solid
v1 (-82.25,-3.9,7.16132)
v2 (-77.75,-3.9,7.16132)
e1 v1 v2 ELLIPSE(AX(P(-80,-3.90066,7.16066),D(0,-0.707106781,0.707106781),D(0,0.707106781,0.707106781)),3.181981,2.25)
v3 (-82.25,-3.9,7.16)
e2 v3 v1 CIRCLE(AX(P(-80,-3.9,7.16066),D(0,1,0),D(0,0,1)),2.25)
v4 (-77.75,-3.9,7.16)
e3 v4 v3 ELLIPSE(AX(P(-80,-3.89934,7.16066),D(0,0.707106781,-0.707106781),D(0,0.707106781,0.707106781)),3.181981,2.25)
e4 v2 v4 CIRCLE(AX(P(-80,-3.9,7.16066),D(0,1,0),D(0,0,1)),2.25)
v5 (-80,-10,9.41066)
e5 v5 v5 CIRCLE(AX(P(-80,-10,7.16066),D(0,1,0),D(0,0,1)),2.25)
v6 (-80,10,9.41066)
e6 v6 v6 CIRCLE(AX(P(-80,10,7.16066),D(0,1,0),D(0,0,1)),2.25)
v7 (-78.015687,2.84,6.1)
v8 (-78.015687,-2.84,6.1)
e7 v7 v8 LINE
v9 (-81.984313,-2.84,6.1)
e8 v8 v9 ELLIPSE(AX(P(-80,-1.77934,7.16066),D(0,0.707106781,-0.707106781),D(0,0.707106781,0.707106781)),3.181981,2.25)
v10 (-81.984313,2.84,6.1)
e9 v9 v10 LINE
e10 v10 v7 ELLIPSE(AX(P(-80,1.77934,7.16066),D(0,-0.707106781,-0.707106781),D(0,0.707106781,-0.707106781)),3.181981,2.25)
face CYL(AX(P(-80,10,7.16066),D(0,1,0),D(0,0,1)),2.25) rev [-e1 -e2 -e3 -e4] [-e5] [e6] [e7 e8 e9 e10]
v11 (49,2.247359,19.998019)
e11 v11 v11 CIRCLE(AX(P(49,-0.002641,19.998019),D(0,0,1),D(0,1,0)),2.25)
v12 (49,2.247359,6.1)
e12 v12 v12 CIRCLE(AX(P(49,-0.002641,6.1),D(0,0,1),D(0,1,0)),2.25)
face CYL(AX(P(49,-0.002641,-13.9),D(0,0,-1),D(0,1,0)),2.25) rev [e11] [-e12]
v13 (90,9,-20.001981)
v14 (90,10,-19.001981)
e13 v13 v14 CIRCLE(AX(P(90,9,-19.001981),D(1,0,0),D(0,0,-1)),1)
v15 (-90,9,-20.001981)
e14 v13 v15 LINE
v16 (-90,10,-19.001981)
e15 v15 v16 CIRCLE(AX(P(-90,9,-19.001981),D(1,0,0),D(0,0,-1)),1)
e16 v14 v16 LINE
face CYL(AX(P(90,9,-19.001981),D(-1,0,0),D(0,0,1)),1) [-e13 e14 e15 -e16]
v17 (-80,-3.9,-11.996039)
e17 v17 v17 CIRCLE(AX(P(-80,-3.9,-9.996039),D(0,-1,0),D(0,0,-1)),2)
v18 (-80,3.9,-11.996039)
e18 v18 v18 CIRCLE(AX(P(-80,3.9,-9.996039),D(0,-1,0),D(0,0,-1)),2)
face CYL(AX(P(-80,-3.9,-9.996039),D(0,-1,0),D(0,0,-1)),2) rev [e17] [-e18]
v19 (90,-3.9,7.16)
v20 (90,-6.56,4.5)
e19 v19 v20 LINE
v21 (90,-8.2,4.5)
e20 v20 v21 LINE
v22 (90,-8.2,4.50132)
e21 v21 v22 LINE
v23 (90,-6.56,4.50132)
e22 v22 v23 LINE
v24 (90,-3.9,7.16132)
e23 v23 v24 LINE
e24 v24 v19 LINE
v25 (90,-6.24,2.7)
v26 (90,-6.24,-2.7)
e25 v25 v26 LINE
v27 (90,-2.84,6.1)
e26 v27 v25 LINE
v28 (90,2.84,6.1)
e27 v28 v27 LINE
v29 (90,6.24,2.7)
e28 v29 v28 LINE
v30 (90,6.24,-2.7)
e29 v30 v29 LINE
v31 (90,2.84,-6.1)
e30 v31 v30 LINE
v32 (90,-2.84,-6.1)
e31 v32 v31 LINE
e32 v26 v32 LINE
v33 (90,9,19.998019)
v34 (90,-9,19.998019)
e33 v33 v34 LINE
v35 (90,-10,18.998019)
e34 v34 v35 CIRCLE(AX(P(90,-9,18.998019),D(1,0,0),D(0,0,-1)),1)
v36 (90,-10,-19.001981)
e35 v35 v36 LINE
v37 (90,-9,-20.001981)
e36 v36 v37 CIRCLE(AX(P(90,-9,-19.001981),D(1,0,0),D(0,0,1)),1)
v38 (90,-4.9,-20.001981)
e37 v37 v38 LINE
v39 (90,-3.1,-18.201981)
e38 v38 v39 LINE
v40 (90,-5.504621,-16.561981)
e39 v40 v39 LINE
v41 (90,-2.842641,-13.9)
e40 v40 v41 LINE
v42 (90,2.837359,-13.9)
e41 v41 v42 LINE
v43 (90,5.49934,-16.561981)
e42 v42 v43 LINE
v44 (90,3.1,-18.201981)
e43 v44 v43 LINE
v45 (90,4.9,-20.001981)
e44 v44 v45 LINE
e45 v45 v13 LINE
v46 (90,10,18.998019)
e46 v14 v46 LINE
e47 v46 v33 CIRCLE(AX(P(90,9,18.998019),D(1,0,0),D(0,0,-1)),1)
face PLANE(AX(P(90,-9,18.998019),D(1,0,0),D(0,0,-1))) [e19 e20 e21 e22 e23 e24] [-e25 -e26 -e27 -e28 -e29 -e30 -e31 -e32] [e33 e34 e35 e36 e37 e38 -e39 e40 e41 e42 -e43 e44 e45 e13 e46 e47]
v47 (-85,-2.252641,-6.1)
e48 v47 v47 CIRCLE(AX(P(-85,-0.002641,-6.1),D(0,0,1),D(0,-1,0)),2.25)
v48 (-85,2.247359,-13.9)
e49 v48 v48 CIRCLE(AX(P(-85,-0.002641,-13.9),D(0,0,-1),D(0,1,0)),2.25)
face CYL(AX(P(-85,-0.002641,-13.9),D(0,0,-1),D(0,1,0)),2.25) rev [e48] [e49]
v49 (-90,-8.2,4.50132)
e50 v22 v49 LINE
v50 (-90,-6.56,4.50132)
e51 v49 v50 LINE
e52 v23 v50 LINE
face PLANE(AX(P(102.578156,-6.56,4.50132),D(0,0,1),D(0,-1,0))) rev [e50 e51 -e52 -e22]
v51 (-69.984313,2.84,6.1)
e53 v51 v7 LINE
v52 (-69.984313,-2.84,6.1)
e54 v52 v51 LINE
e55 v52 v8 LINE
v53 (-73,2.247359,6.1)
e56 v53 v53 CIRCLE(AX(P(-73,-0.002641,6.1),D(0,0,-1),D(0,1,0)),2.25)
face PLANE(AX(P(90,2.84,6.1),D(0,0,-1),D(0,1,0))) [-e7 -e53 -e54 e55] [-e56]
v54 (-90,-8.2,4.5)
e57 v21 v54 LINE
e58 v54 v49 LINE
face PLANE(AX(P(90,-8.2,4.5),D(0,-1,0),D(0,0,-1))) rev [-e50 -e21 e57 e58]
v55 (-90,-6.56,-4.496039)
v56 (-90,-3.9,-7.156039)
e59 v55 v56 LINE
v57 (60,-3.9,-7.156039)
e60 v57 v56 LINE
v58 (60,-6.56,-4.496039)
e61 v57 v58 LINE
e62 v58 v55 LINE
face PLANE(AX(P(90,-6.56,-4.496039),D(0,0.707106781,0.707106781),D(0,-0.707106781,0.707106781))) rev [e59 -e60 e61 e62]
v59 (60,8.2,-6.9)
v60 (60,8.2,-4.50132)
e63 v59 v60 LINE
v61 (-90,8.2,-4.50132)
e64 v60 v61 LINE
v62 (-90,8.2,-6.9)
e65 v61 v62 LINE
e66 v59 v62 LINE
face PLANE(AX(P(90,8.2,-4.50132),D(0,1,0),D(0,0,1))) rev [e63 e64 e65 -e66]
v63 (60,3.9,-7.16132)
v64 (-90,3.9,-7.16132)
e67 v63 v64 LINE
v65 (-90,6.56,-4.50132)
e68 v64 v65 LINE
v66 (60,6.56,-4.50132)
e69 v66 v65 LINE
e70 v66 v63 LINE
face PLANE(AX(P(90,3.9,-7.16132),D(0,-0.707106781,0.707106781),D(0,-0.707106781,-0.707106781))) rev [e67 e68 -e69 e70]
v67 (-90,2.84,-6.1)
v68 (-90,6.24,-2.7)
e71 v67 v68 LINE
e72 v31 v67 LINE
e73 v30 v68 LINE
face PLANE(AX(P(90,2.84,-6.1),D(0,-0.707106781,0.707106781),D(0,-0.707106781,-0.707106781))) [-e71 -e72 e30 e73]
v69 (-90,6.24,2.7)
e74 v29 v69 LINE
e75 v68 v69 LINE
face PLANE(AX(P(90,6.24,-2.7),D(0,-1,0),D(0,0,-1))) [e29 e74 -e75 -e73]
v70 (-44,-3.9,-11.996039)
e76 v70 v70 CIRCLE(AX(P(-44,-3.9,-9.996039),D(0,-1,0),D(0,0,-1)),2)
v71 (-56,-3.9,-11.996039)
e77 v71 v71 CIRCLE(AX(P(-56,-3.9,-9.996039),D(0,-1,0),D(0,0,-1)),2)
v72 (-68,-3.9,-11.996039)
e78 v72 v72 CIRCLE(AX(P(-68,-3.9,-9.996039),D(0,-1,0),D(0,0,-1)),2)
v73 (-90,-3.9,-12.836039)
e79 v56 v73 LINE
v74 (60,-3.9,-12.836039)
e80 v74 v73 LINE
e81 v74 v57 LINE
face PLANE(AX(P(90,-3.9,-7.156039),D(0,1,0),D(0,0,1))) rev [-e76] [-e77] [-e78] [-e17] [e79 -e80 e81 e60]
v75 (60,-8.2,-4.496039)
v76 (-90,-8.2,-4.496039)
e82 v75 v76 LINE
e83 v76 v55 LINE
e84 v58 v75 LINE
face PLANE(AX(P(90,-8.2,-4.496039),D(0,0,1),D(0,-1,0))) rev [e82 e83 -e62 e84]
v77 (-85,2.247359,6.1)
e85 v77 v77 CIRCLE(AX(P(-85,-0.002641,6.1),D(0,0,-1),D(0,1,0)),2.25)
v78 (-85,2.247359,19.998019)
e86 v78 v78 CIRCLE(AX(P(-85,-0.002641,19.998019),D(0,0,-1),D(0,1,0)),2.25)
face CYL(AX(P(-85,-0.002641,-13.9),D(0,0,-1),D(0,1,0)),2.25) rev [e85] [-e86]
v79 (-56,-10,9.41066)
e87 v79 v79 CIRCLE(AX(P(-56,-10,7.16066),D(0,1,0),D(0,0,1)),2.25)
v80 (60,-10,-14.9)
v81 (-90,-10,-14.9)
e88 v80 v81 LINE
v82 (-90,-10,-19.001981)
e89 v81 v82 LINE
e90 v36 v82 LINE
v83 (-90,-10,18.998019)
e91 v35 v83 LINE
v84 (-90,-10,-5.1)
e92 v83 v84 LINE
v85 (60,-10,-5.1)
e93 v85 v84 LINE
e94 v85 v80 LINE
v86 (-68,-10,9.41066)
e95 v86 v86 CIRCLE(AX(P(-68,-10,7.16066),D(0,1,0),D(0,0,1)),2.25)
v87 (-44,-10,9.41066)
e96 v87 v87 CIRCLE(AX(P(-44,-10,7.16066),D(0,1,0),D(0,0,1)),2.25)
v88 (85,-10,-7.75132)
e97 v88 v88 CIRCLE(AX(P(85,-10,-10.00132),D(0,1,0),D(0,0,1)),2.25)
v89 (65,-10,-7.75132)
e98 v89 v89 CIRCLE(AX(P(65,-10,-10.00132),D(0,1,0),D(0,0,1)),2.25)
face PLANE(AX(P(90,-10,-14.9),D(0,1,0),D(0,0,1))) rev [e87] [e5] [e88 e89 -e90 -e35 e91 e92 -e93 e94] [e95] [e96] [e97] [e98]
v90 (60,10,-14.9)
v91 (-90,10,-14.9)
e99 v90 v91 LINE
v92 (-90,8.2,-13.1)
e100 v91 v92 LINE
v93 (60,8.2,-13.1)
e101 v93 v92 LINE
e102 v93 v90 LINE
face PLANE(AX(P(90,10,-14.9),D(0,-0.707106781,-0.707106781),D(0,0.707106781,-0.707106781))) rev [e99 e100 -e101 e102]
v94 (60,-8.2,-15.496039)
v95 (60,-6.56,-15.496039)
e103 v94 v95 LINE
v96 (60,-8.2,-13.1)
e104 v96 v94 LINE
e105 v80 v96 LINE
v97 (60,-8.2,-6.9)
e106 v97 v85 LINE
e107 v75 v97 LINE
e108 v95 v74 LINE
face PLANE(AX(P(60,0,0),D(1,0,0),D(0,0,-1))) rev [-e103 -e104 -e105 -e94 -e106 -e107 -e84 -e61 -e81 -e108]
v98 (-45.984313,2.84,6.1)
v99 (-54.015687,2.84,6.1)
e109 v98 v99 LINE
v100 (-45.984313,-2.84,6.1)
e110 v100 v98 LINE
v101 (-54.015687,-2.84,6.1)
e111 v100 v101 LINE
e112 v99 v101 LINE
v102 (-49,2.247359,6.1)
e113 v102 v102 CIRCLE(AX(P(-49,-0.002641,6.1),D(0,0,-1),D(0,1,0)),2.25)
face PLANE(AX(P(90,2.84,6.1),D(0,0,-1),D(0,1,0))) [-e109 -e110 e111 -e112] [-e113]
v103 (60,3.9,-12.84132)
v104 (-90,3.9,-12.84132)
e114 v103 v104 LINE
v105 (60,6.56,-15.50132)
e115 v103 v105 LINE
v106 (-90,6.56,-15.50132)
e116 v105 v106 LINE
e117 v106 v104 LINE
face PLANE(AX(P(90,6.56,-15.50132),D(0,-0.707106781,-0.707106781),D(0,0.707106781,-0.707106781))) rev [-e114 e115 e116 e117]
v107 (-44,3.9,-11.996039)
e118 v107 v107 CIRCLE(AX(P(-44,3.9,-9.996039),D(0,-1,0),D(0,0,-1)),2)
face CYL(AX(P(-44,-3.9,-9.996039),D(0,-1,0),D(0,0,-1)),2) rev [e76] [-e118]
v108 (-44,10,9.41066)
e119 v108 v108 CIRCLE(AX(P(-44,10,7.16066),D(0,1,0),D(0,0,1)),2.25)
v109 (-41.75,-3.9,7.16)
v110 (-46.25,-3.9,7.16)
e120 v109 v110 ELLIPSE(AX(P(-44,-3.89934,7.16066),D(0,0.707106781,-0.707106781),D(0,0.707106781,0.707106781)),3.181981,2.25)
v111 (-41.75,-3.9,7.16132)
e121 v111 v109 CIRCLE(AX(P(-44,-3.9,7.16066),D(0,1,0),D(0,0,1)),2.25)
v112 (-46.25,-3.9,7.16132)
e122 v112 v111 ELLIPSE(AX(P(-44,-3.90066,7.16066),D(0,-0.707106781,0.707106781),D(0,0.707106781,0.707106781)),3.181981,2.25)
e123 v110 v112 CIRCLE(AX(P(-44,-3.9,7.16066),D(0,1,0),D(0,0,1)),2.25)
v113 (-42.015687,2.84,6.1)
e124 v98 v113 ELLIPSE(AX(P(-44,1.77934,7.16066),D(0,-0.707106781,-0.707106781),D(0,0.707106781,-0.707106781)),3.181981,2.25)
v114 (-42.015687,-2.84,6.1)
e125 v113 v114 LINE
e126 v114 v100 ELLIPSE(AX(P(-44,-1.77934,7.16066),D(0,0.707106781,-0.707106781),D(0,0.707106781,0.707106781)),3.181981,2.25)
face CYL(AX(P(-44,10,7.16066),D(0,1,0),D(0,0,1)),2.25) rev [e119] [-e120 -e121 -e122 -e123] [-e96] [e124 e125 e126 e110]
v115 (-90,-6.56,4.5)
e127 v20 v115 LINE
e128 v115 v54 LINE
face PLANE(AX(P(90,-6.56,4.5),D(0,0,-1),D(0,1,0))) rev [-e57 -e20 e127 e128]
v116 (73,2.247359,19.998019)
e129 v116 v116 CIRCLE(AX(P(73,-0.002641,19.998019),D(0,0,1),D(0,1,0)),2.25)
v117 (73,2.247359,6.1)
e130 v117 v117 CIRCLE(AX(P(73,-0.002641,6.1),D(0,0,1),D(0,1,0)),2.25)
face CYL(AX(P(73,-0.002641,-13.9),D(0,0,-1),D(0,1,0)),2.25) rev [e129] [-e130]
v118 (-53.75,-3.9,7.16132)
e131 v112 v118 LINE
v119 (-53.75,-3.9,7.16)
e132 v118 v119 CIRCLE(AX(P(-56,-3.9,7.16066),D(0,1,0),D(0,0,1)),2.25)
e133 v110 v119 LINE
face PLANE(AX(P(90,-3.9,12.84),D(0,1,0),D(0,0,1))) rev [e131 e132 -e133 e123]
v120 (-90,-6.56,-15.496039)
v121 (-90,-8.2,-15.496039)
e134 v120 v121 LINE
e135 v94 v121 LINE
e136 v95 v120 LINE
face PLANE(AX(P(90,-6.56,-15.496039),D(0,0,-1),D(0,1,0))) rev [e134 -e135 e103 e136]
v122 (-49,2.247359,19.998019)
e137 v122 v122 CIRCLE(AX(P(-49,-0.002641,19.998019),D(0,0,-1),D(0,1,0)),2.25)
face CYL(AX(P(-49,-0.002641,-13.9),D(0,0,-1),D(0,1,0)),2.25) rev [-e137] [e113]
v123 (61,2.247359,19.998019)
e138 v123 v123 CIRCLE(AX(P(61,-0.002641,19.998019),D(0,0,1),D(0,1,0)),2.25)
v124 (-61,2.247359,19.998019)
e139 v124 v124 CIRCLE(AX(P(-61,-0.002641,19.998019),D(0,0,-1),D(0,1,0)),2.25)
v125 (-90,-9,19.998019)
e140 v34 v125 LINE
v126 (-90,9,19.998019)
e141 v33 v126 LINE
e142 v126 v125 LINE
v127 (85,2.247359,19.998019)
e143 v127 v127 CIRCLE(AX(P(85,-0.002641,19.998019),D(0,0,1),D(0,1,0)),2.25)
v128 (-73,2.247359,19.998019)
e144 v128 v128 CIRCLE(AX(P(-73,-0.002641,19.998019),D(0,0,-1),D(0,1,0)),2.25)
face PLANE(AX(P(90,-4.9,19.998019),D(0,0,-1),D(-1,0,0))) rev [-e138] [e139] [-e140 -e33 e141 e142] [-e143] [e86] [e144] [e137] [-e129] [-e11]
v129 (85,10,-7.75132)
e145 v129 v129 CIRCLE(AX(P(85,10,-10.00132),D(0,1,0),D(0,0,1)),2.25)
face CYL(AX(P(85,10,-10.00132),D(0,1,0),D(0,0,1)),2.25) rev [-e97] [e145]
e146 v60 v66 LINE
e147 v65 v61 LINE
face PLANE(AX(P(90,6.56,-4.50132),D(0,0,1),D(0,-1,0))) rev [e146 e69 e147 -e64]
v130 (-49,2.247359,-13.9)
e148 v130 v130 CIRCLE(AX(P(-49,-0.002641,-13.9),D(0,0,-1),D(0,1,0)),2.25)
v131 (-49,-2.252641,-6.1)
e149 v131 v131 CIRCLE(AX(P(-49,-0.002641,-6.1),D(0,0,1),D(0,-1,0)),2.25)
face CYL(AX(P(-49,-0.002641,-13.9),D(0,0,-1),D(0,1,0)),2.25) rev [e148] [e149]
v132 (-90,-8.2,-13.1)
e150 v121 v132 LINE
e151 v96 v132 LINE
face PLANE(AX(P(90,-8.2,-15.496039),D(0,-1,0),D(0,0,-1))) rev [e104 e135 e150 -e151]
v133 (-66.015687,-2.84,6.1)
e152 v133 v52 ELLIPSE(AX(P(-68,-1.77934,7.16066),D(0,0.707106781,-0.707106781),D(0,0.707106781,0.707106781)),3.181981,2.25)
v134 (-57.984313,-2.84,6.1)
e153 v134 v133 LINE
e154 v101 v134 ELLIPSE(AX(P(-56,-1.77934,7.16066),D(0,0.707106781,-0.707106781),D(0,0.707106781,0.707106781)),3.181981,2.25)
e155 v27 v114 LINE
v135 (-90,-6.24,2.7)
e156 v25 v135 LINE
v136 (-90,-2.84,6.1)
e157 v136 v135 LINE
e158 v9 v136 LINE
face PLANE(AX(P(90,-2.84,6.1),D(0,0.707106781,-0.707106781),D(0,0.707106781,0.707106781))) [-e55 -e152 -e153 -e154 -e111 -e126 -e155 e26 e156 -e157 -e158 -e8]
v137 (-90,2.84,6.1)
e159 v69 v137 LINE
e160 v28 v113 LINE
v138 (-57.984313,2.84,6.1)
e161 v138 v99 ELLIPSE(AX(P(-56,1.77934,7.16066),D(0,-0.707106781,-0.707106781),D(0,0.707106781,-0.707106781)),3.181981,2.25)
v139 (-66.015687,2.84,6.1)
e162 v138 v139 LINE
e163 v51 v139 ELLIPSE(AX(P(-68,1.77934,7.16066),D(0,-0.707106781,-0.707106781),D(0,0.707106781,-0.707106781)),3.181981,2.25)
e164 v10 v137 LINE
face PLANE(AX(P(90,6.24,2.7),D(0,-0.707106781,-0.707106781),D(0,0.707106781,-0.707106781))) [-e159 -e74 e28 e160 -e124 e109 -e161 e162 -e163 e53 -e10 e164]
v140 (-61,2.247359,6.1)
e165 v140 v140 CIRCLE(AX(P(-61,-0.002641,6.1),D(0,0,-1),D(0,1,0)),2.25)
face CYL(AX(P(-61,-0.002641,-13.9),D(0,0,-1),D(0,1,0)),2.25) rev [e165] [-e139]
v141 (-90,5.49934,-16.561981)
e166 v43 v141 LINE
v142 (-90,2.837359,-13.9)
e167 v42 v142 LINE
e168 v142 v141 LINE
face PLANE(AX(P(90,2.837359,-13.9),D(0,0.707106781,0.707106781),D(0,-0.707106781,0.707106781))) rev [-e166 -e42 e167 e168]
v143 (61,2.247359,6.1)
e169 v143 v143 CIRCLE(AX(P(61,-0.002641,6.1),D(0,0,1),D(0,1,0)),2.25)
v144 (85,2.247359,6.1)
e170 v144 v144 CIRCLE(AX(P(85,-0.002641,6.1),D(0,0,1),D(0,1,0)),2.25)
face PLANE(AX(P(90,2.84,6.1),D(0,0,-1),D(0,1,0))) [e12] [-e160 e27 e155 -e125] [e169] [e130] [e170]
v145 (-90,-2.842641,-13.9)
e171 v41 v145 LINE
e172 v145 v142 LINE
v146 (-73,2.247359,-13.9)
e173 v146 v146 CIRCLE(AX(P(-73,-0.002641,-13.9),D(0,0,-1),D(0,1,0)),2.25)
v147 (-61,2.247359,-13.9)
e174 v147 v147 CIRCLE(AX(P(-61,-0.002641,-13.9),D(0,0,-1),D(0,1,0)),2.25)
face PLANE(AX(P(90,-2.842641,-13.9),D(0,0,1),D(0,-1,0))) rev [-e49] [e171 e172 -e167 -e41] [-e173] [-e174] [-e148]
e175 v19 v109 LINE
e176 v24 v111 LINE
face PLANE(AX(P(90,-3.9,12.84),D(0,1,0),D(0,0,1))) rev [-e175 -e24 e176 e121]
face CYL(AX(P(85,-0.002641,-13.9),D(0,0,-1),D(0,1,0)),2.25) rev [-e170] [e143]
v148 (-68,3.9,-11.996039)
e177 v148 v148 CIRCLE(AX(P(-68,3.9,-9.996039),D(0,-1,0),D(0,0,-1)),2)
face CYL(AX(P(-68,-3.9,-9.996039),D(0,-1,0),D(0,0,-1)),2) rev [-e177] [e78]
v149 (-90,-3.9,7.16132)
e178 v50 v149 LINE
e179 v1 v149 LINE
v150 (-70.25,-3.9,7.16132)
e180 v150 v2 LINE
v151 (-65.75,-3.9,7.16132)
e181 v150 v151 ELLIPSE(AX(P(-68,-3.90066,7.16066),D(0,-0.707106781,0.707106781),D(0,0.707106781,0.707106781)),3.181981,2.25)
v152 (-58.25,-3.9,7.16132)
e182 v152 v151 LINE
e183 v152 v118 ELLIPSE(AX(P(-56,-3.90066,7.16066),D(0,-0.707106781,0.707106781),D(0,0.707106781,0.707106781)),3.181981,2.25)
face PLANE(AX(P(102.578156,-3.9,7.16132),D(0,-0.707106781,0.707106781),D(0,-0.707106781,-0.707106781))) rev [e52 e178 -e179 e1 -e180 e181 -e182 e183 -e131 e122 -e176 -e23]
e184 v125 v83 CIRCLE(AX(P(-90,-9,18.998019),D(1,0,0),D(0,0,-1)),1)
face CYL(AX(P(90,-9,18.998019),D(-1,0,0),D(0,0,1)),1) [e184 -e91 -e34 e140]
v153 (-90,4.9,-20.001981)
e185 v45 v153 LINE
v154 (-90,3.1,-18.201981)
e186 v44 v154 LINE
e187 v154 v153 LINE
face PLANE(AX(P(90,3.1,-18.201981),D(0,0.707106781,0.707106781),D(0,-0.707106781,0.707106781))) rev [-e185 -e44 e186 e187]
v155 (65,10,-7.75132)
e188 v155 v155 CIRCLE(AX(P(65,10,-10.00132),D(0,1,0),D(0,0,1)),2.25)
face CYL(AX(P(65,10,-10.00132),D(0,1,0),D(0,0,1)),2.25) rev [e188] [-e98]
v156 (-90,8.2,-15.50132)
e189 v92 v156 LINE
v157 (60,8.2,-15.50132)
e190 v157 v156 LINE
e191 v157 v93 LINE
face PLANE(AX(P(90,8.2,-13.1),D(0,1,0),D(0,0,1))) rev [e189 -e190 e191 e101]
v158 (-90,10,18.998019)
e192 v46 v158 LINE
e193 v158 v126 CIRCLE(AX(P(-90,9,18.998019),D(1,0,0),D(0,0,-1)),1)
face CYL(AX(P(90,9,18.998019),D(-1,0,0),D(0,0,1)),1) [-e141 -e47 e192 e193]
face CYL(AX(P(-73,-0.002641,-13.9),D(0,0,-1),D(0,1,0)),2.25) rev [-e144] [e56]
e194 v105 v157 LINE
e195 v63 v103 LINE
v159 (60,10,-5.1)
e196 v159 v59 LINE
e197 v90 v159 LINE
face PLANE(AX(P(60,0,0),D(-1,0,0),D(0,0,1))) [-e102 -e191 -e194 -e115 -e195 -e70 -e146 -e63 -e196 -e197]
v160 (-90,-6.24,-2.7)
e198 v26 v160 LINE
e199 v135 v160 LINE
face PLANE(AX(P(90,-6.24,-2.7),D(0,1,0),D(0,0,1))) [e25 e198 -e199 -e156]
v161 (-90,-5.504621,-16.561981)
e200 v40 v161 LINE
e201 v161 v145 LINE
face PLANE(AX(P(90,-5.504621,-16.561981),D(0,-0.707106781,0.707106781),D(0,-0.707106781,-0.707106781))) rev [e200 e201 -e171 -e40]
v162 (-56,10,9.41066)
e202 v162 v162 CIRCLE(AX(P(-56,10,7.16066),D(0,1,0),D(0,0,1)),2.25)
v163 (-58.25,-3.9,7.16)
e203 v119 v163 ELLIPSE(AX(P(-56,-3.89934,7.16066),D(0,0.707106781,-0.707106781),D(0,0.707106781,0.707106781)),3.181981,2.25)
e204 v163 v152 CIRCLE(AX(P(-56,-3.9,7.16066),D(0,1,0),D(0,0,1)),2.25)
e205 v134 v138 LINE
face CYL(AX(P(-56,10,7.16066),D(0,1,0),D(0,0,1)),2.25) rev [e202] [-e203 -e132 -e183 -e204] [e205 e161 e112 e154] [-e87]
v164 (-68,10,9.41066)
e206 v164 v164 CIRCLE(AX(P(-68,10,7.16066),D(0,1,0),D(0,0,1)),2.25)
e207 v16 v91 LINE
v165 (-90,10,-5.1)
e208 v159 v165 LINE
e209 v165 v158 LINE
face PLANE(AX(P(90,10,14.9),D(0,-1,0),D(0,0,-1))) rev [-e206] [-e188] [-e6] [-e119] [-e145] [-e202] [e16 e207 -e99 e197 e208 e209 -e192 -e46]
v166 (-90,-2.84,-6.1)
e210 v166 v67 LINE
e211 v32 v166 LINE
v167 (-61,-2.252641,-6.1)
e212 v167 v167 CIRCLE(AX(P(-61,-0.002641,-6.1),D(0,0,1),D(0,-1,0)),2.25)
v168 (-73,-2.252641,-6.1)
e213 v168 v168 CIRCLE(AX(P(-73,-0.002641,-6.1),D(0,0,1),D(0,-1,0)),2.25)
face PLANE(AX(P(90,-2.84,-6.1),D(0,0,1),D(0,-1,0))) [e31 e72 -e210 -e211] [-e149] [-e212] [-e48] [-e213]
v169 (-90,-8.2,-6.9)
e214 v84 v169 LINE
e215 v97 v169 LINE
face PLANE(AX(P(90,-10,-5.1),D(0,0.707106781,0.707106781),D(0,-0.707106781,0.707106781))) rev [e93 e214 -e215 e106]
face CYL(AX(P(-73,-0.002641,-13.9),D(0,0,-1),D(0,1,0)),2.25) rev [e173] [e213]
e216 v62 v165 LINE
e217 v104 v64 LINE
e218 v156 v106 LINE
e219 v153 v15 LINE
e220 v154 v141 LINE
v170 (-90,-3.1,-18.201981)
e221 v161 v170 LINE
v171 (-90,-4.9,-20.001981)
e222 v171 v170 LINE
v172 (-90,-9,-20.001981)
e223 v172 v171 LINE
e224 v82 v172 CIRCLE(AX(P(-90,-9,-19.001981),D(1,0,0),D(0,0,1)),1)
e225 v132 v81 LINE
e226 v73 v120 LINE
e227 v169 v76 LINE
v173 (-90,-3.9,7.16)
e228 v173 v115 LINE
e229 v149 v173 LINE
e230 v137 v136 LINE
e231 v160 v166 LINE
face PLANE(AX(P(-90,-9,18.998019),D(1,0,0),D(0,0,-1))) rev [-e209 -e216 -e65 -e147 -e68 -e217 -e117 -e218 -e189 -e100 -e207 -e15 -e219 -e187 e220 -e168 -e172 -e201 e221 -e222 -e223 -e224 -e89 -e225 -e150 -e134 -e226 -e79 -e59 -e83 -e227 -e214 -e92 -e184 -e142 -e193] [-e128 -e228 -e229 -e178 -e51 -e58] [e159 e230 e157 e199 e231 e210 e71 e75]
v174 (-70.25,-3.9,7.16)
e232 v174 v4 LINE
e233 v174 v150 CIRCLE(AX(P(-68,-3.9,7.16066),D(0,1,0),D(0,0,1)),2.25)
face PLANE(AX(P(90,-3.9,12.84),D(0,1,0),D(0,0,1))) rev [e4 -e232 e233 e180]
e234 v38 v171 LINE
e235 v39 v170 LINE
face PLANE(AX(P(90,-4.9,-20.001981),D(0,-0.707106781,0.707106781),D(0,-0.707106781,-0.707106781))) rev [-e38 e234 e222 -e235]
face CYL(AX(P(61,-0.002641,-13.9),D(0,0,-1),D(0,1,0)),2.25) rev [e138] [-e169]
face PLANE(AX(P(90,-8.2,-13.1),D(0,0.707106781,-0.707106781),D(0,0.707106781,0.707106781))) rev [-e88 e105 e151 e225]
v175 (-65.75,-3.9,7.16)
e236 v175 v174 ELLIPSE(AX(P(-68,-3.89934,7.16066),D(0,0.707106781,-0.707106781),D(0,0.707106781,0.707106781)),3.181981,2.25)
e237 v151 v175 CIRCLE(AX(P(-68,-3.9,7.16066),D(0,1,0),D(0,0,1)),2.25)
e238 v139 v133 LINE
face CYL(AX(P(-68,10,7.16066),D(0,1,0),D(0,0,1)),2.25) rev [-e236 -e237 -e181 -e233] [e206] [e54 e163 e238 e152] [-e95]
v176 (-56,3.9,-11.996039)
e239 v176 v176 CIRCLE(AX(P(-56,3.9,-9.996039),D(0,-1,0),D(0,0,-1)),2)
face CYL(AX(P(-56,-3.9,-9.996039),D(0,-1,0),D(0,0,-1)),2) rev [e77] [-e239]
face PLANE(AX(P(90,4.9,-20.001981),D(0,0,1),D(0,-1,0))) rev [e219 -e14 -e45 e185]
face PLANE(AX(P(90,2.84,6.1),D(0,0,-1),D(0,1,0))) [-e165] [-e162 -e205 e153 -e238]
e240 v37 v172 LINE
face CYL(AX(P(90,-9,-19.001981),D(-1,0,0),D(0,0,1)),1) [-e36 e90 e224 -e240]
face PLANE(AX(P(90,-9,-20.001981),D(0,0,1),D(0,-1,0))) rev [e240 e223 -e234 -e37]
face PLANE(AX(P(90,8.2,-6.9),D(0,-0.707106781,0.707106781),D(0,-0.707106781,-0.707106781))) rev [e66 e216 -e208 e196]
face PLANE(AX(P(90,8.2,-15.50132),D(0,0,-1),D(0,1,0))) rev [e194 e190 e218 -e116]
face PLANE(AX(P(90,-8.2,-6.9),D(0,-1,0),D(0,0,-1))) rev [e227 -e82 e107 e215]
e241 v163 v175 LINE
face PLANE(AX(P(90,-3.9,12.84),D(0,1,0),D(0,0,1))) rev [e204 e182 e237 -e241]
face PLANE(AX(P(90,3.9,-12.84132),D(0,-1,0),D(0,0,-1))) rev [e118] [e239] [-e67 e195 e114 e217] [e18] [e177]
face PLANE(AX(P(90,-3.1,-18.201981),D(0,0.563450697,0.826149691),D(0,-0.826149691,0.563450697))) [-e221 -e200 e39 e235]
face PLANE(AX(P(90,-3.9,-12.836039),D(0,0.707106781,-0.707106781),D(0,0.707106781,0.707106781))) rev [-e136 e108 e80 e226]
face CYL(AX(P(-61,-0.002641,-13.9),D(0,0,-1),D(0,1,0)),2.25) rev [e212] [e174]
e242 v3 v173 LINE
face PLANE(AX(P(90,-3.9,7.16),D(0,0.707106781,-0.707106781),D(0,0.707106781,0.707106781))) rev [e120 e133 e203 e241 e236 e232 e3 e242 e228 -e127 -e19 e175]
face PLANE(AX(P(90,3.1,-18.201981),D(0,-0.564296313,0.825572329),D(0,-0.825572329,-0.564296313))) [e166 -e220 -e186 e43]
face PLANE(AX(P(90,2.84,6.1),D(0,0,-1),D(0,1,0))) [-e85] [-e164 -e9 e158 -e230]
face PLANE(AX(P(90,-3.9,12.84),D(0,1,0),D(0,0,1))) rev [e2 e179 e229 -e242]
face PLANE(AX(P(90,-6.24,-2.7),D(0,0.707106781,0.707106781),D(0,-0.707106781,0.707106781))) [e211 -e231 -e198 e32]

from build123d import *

# Parameters (mm, degrees)
BOSS_EXTRUDE1_DEPTH             = 90
BOSS_EXTRU_2_DEPTH              = 180
BOSS_EXTRUDE2_DEPTH             = 180
DIAM_TRE_DU_PER_AGE_4_5_4_5_1_D = 4.5
DIAM_TRE_DU_PER_AGE_4_0_4_1_D   = 4
F_4_5_4_5_DIAMETER_HOLE1_D      = 4.5
BOSS_EXTRU_1_DEPTH              = 30
BOSS_EXTRU_3_DEPTH              = 30
SYM_TRIE2_START                 = 6.1
SYM_TRIE2_OUTLINE_R             = 2.25
SYM_TRIE2_DEPTH                 = 13.898019485
DIAM_TRE_DU_PER_AGE_4_5_4_5_4_D = 4.5
ESQUISSE15_W                    = 5.4
ESQUISSE15_H                    = 1.96
BOSS_EXTRU_4_DEPTH              = 180


# Read off the part's stored shape, not the designer's step: Symétrie2
with BuildPart() as part:
    # Sketch5 → Boss-Extrude1 (new, symmetric)
    with BuildSketch(Plane(origin=(0, 0, 0), x_dir=(0, 0, -1), z_dir=(1, 0, 0))):
        with BuildLine():
            Line((-19.998019485, 4.9), (-18.198019485, 3.1))
            Line((-18.198019485, 3.1), (-18.198019485, 5.499339828))
            Line((-18.198019485, 5.499339828), (-16.558019485, 5.499339828))
            Line((-16.558019485, 5.499339828), (-13.9, 2.841320344))
            Line((-13.9, 2.841320344), (-13.9, -2.838679656))
            Line((-13.9, -2.838679656), (-16.558019485, -5.496699141))
            Line((-16.558019485, -5.496699141), (-18.198019485, -5.496699141))
            Line((-18.198019485, -5.496699141), (-18.198019485, -3.1))
            Line((-18.198019485, -3.1), (-19.998019485, -4.9))
            Line((-19.998019485, -4.9), (-19.998019485, -9))
            ThreePointArc((-19.998019485, -9), (-19.705126266, -9.707106781), (-18.998019485, -10))
            Line((-18.998019485, -10), (-14.9, -10))
            Line((-14.9, -10), (-13.1, -8.2))
            Line((-13.1, -8.2), (-15.5, -8.2))
            Line((-15.5, -8.2), (-15.5, -6.56))
            Line((-15.5, -6.56), (-12.84, -3.9))
            Line((-12.84, -3.9), (-7.16, -3.9))
            Line((-7.16, -3.9), (-4.5, -6.56))
            Line((-4.5, -6.56), (-4.5, -8.2))
            Line((-4.5, -8.2), (-6.9, -8.2))
            Line((-6.9, -8.2), (-5.1, -10))
            Line((-5.1, -10), (5.1, -10))
            Line((5.1, -10), (6.9, -8.2))
            Line((6.9, -8.2), (4.496038969, -8.2))
            Line((4.496038969, -8.2), (4.496038969, -6.56))
            Line((4.496038969, -6.56), (7.156038969, -3.9))
            Line((7.156038969, -3.9), (12.836038969, -3.9))
            Line((12.836038969, -3.9), (15.496038969, -6.56))
            Line((15.496038969, -6.56), (15.496038969, -8.2))
            Line((15.496038969, -8.2), (13.1, -8.2))
            Line((13.1, -8.2), (14.9, -10))
            Line((14.9, -10), (19.001980515, -10))
            ThreePointArc((19.001980515, -10), (19.709087297, -9.707106781), (20.001980515, -9))
            Line((20.001980515, -9), (20.001980515, -4.9))
            Line((20.001980515, -4.9), (18.201980515, -3.1))
            Line((18.201980515, -3.1), (18.201980515, -5.504621202))
            Line((18.201980515, -5.504621202), (16.561980515, -5.504621202))
            Line((16.561980515, -5.504621202), (13.9, -2.842640687))
            Line((13.9, -2.842640687), (13.9, 2.837359313))
            Line((13.9, 2.837359313), (16.561980515, 5.499339828))
            Line((16.561980515, 5.499339828), (18.201980515, 5.499339828))
            Line((18.201980515, 5.499339828), (18.201980515, 3.1))
            Line((18.201980515, 3.1), (20.001980515, 4.9))
            Line((20.001980515, 4.9), (20.001980515, 9))
            ThreePointArc((20.001980515, 9), (19.709087297, 9.707106781), (19.001980515, 10))
            Line((19.001980515, 10), (14.9, 10))
            Line((14.9, 10), (13.1, 8.2))
            Line((13.1, 8.2), (15.501320344, 8.2))
            Line((15.501320344, 8.2), (15.501320344, 6.56))
            Line((15.501320344, 6.56), (12.841320344, 3.9))
            Line((12.841320344, 3.9), (7.161320344, 3.9))
            Line((7.161320344, 3.9), (4.501320344, 6.56))
            Line((4.501320344, 6.56), (4.501320344, 8.2))
            Line((4.501320344, 8.2), (6.9, 8.2))
            Line((6.9, 8.2), (5.1, 10))
            Line((5.1, 10), (-5.1, 10))
            Line((-5.1, 10), (-6.9, 8.2))
            Line((-6.9, 8.2), (-4.501320344, 8.2))
            Line((-4.501320344, 8.2), (-4.501320344, 6.56))
            Line((-4.501320344, 6.56), (-7.161320344, 3.9))
            Line((-7.161320344, 3.9), (-12.841320344, 3.9))
            Line((-12.841320344, 3.9), (-15.501320344, 6.56))
            Line((-15.501320344, 6.56), (-15.501320344, 8.2))
            Line((-15.501320344, 8.2), (-13.1, 8.2))
            Line((-13.1, 8.2), (-14.9, 10))
            Line((-14.9, 10), (-18.998019485, 10))
            ThreePointArc((-18.998019485, 10), (-19.705126266, 9.707106781), (-19.998019485, 9))
            Line((-19.998019485, 9), (-19.998019485, 4.9))
        make_face()
        Polygon((6.1, -2.84), (6.1, 2.84), (2.7, 6.24), (2.7, 8.2), (-2.7, 8.2), (-2.7, 6.24), (-6.1, 2.84), (-6.1, -2.84), (-2.7, -6.24), (-2.7, -8.2), (2.7, -8.2), (2.7, -6.24), align=None, mode=Mode.SUBTRACT)
    extrude(amount=BOSS_EXTRUDE1_DEPTH, both=True)

    # Esquisse10 → Boss.-Extru.2 (add, through all)
    with BuildSketch(Plane(origin=(90, 0, 0), x_dir=(0, 0, -1), z_dir=(1, 0, 0))):
        Polygon((-19.998019485, 4.9), (-19.998019485, -4.9), (-18.198019485, -3.1), (-18.198019485, -5.496699141), (-16.558019485, -5.496699141), (-13.9, -2.838679656), (-13.9, 2.841320344), (-16.558019485, 5.499339828), (-18.198019485, 5.499339828), (-18.198019485, 3.1), align=None)
    extrude(amount=-BOSS_EXTRU_2_DEPTH)

    # Sketch6 → Boss-Extrude2 (add)
    with BuildSketch(Plane.ZY.offset(90)):
        Polygon((5.1, 10), (14.9, 10), (13.1, 8.2), (15.501320344, 8.2), (15.501320344, 6.56), (12.841320344, 3.9), (7.161320344, 3.9), (4.501320344, 6.56), (4.501320344, 8.2), (6.9, 8.2), align=None)
    boss_extrude2 = extrude(amount=-BOSS_EXTRUDE2_DEPTH)

    # Diamètre du perçage Ø4.5 (4.5)1 (through all)
    with Locations(Plane(origin=(0, 0, -13.9), x_dir=(-1, 0, 0), z_dir=(0, 0, -1))):
        with Locations((85, -0.002640687), (73, -0.002640687), (61, -0.002640687), (49, -0.002640687)):
            Hole(DIAM_TRE_DU_PER_AGE_4_5_4_5_1_D / 2)

    # Diamètre du perçage Ø4.0 (4)1 (through all)
    with Locations(Plane(origin=(0, -3.9, 0), x_dir=(-1, 0, 0), z_dir=(0, -1, 0))):
        with Locations((44, 9.996038969), (80, 9.996038969), (68, 9.996038969), (56, 9.996038969)):
            Hole(DIAM_TRE_DU_PER_AGE_4_0_4_1_D / 2)

    # Mirror1: Boss-Extrude2 across plane
    add(boss_extrude2.mirror(Plane.ZX))

    # Ø4.5 (4.5) Diameter Hole1 (through all)
    with Locations(Plane(origin=(0, 10, 0), x_dir=(-1, 0, 0), z_dir=(0, 1, 0))):
        with Locations((80, 7.160660172), (44, 7.160660172), (56, 7.160660172), (68, 7.160660172)):
            Hole(F_4_5_4_5_DIAMETER_HOLE1_D / 2)

    # Esquisse7 → Boss.-Extru.1 (add)
    with BuildSketch(Plane(origin=(90, 0, 0), x_dir=(0, 0, -1), z_dir=(1, 0, 0))):
        Polygon((14.9, -10), (5.1, -10), (6.9, -8.2), (4.496038969, -8.2), (4.496038969, -6.56), (7.156038969, -3.9), (12.836038969, -3.9), (15.496038969, -6.56), (15.496038969, -8.2), (13.1, -8.2), align=None)
    extrude(amount=-BOSS_EXTRU_1_DEPTH)

    # Esquisse11 → Boss.-Extru.3 (add)
    with BuildSketch(Plane(origin=(90, 0, 0), x_dir=(0, 0, -1), z_dir=(1, 0, 0))):
        Polygon((14.9, 10), (5.1, 10), (6.9, 8.2), (4.501320344, 8.2), (4.501320344, 6.56), (7.161320344, 3.9), (12.841320344, 3.9), (15.501320344, 6.56), (15.501320344, 8.2), (13.1, 8.2), align=None)
    extrude(amount=-BOSS_EXTRU_3_DEPTH)

    # Symétrie2 outline → Symétrie2 (cut)
    with BuildSketch(Plane.XY.offset(SYM_TRIE2_START)):
        with Locations((49, -0.002640687)):
            Circle(SYM_TRIE2_OUTLINE_R)
        with Locations((61, -0.002640687)):
            Circle(SYM_TRIE2_OUTLINE_R)
        with Locations((73, -0.002640687)):
            Circle(SYM_TRIE2_OUTLINE_R)
        with Locations((85, -0.002640687)):
            Circle(SYM_TRIE2_OUTLINE_R)
    extrude(amount=SYM_TRIE2_DEPTH, mode=Mode.SUBTRACT)

    # Diamètre du perçage Ø4.5 (4.5)4 (through all)
    with Locations(Plane(origin=(0, 10, 0), x_dir=(1, 0, 0), z_dir=(0, 1, 0))):
        with Locations((65, 10.001320344), (85, 10.001320344)):
            Hole(DIAM_TRE_DU_PER_AGE_4_5_4_5_4_D / 2)

    # Esquisse15 → Boss.-Extru.4 (add, through all)
    with BuildSketch(Plane.ZY.offset(90)):
        with Locations((0, -7.22)):
            Rectangle(ESQUISSE15_W, ESQUISSE15_H)
        with Locations((0, 7.22)):
            Rectangle(ESQUISSE15_W, ESQUISSE15_H)
        Polygon((-18.201980515, -3.1), (-16.561980515, -5.504621202), (-18.201980515, -5.504621202), align=None)
        Polygon((-18.201980515, 3.1), (-16.561980515, 5.499339828), (-18.201980515, 5.499339828), align=None)
    extrude(amount=-BOSS_EXTRU_4_DEPTH)


solid = part.part
